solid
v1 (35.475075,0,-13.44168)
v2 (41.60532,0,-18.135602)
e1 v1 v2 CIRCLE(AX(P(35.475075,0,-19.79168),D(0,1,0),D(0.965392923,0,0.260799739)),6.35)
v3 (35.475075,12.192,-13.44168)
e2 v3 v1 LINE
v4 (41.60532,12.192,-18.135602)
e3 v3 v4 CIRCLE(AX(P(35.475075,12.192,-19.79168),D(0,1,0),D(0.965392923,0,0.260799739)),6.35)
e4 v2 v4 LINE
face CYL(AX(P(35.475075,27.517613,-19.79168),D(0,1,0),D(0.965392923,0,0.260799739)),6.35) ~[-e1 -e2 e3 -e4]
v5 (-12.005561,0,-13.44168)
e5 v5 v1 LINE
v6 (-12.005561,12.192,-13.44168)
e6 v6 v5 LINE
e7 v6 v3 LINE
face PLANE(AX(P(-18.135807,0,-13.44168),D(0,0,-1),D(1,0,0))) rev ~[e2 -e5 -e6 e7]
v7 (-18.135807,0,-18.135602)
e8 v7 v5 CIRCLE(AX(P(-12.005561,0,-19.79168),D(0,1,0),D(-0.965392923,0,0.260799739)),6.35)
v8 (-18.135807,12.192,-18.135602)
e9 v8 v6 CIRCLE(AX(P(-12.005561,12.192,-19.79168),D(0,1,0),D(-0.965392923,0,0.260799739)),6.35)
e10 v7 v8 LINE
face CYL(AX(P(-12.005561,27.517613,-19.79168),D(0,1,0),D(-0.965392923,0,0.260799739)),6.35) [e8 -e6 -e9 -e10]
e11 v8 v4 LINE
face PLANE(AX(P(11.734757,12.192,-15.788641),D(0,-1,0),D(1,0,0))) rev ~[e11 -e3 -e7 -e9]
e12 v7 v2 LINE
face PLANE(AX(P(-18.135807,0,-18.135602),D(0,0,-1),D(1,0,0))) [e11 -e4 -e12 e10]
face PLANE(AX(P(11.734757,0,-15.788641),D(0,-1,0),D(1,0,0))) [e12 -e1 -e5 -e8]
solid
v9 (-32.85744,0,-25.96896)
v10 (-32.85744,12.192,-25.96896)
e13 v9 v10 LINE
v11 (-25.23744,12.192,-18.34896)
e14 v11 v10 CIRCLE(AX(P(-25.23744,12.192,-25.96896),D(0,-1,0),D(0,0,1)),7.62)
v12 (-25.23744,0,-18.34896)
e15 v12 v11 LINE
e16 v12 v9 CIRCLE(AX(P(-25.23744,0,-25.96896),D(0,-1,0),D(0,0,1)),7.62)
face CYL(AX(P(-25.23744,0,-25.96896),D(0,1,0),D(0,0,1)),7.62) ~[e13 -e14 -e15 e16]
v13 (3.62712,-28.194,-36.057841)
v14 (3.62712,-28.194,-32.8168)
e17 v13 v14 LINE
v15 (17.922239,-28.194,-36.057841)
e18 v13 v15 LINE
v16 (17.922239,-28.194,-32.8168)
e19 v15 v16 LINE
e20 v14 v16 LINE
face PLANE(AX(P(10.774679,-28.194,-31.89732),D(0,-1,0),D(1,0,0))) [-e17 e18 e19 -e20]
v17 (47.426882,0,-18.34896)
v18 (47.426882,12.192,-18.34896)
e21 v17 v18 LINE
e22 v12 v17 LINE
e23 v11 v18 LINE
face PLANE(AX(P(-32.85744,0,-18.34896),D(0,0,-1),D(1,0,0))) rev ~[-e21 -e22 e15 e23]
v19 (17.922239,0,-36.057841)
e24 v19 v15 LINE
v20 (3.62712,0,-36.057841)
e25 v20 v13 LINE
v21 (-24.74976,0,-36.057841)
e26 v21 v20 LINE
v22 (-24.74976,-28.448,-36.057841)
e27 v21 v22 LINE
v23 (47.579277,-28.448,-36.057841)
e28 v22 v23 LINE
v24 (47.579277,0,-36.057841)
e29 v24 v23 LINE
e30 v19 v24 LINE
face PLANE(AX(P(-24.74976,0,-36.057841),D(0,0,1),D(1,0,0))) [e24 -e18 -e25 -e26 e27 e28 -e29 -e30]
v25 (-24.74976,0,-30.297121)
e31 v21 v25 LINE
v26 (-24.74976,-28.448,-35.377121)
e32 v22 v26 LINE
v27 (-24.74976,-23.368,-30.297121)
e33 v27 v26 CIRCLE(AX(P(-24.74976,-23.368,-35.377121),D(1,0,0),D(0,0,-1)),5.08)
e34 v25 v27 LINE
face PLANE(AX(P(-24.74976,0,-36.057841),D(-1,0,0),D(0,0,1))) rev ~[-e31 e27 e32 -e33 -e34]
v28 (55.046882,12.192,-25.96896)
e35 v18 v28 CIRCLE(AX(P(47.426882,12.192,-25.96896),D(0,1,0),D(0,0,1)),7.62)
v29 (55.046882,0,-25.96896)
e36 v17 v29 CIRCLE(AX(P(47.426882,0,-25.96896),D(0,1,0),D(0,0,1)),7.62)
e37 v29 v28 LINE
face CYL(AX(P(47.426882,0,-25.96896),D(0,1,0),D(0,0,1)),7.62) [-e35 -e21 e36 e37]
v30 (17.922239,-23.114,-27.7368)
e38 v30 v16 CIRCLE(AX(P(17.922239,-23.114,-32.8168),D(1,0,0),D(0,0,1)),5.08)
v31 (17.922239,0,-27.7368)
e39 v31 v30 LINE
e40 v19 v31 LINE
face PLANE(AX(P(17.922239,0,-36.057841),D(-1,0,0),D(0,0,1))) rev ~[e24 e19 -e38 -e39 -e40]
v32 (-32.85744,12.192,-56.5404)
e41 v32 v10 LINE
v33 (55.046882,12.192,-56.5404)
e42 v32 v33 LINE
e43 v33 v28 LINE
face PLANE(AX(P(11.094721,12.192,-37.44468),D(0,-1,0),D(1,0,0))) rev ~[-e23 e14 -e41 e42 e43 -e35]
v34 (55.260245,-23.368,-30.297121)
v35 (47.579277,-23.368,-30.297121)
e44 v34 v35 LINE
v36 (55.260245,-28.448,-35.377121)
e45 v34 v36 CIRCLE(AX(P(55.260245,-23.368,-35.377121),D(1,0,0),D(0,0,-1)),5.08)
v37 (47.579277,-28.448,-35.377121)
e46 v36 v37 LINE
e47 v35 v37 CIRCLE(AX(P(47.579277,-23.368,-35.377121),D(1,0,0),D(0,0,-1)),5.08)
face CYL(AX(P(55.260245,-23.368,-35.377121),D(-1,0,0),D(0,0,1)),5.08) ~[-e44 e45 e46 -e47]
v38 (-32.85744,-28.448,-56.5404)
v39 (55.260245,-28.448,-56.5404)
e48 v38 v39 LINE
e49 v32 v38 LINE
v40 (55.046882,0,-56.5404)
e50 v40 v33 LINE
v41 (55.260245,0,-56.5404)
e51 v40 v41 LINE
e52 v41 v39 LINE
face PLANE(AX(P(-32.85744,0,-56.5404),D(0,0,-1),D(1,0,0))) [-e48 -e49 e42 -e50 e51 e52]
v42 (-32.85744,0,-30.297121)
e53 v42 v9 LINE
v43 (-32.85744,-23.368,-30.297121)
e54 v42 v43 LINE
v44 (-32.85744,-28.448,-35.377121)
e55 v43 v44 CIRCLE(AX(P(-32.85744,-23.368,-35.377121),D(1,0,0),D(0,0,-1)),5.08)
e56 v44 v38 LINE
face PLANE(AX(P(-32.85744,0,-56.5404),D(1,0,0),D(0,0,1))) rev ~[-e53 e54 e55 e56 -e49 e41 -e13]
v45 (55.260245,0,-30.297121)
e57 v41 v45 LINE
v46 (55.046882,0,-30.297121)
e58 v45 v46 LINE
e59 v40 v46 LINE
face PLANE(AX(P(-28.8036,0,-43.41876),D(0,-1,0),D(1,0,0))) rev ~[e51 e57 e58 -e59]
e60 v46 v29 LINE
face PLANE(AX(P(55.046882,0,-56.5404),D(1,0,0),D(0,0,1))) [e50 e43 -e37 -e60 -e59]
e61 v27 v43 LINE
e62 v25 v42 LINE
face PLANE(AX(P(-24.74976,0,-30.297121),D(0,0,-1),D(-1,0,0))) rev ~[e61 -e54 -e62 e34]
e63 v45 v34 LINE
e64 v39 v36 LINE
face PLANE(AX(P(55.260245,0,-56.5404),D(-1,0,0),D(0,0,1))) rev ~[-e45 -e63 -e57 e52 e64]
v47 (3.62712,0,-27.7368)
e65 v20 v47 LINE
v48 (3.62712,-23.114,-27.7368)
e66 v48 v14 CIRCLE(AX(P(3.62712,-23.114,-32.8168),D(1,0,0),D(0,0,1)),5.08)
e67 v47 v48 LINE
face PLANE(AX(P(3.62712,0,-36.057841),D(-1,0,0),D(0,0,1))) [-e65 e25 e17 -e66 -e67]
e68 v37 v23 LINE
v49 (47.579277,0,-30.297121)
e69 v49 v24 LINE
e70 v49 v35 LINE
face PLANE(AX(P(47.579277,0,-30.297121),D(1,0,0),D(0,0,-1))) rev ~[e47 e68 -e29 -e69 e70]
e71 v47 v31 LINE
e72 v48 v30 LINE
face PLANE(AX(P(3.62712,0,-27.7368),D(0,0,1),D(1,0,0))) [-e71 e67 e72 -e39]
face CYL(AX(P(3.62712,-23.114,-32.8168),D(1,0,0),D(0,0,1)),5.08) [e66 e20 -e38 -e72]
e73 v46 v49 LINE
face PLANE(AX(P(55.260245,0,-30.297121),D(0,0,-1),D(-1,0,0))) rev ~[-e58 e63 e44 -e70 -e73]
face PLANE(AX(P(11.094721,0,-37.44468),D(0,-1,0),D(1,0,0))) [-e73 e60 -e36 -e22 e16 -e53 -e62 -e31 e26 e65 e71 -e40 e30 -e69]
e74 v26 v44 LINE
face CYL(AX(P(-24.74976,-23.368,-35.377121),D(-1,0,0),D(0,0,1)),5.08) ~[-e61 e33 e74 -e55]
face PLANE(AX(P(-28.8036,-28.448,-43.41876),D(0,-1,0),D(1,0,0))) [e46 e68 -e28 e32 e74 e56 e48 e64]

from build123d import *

# Parameters (mm, degrees)
F0_W         = 72.3290368915
F0_H         = 20.4825587571
F1_DEPTH     = 28.448
F2_W         = 87.9043228924
F2_H         = 38.1914395839
F3_DEPTH     = 12.192
F4_W         = 14.2951197922
F4_H         = 8.3210412413
F5_DEPTH     = 28.194
F6_R         = 5.08
F7_R         = 5.08
F8_R         = 7.62
F9_R         = 7.62
F10_W        = 59.7411263734
F10_H        = 4.6939216554
F11_DEPTH    = 12.192
F12_T1_DEPTH = 42.8432253085
F13_T1_DEPTH = 42.8432253085


# Not quite as in the source:
# - a fillet or chamfer that OpenCascade refuses, or shapes differently, is made with other operations: its cross-section is extruded or revolved along the edge and cut away or added


with BuildPart() as f1:
    # F0 (on Front) → F1 (new body)
    with BuildSketch(Plane.XZ):
        Polygon((-24.7497595847, -56.5403997898), (-24.7497595847, -36.0578410327), (-24.7497595847, -30.2971210331), (-32.857440412, -30.2971210331), (-32.857440412, -56.5403997898), align=None)
        Polygon((47.5792773068, -30.2971210331), (47.5792773068, -36.0578410327), (47.5792773068, -56.5403997898), (55.2602447569, -56.5403997898), (55.2602447569, -30.2971210331), align=None)
        with Locations((11.4147588611, -46.2991204113)):
            Rectangle(F0_W, F0_H)
    extrude(amount=F1_DEPTH)

    # F2 (on Front) → F3 (join)
    with BuildSketch(Plane.XZ):
        with Locations((11.0947210342, -37.4446799979)):
            Rectangle(F2_W, F2_H)
    extrude(amount=-F3_DEPTH)

    # F4 (on Front) → F5 (join)
    with BuildSketch(Plane.XZ):
        with Locations((10.774679482, -31.8973204121)):
            Rectangle(F4_W, F4_H)
    extrude(amount=F5_DEPTH)

    # F6
    f6_edges = [f1.edges().sort_by_distance(p)[0] for p in [
        (10.774679, -28.194, -27.7368),
    ]]
    fillet(f6_edges, radius=F6_R)

    # F7
    f7_edges = [f1.edges().sort_by_distance(p)[0] for p in [
        (51.419761, -28.448, -30.297121),
        (-28.8036, -28.448, -30.297121),
    ]]
    fillet(f7_edges, radius=F7_R)

    # F8
    f8_edges = [f1.edges().sort_by_distance(p)[0] for p in [
        (55.046882, 6.096, -18.34896),
    ]]
    fillet(f8_edges, radius=F8_R)

    # F9
    f9_edges = [f1.edges().sort_by_distance(p)[0] for p in [
        (-32.85744, 6.096, -18.34896),
    ]]
    fillet(f9_edges, radius=F9_R)


with BuildPart() as f11:
    # F10 (on Front) → F11 (new body)
    with BuildSketch(Plane.XZ):
        with Locations((11.7347566411, -15.7886408269)):
            Rectangle(F10_W, F10_H)
    extrude(amount=-F11_DEPTH)

    # F12: fillet of radius 6.35 on 1 edges, made by hand

    # F12_s2 → F12_t1 (cut)
    with BuildSketch(Plane.XZ.offset(-27.5176126543)):
        with BuildLine():
            ThreePointArc((41.6053198278, -18.1356016546), (39.3355412218, -14.7499244772), (35.4750747661, -13.4416799992))
            Line((35.4750747661, -13.4416799992), (41.6053198278, -13.4416799992))
            Line((41.6053198278, -13.4416799992), (41.6053198278, -18.1356016546))
        make_face()
    extrude(amount=F12_T1_DEPTH, mode=Mode.SUBTRACT)

    # F13: fillet of radius 6.35 on 1 edges, made by hand

    # F13_s2 → F13_t1 (cut)
    with BuildSketch(Plane.XZ.offset(-27.5176126543)):
        with BuildLine():
            ThreePointArc((-18.1358065456, -18.1356016546), (-15.8660279397, -14.7499244772), (-12.0055614839, -13.4416799992))
            Line((-12.0055614839, -13.4416799992), (-18.1358065456, -13.4416799992))
            Line((-18.1358065456, -13.4416799992), (-18.1358065456, -18.1356016546))
        make_face()
    extrude(amount=F13_T1_DEPTH, mode=Mode.SUBTRACT)


solid = Compound([f1.part, f11.part])
